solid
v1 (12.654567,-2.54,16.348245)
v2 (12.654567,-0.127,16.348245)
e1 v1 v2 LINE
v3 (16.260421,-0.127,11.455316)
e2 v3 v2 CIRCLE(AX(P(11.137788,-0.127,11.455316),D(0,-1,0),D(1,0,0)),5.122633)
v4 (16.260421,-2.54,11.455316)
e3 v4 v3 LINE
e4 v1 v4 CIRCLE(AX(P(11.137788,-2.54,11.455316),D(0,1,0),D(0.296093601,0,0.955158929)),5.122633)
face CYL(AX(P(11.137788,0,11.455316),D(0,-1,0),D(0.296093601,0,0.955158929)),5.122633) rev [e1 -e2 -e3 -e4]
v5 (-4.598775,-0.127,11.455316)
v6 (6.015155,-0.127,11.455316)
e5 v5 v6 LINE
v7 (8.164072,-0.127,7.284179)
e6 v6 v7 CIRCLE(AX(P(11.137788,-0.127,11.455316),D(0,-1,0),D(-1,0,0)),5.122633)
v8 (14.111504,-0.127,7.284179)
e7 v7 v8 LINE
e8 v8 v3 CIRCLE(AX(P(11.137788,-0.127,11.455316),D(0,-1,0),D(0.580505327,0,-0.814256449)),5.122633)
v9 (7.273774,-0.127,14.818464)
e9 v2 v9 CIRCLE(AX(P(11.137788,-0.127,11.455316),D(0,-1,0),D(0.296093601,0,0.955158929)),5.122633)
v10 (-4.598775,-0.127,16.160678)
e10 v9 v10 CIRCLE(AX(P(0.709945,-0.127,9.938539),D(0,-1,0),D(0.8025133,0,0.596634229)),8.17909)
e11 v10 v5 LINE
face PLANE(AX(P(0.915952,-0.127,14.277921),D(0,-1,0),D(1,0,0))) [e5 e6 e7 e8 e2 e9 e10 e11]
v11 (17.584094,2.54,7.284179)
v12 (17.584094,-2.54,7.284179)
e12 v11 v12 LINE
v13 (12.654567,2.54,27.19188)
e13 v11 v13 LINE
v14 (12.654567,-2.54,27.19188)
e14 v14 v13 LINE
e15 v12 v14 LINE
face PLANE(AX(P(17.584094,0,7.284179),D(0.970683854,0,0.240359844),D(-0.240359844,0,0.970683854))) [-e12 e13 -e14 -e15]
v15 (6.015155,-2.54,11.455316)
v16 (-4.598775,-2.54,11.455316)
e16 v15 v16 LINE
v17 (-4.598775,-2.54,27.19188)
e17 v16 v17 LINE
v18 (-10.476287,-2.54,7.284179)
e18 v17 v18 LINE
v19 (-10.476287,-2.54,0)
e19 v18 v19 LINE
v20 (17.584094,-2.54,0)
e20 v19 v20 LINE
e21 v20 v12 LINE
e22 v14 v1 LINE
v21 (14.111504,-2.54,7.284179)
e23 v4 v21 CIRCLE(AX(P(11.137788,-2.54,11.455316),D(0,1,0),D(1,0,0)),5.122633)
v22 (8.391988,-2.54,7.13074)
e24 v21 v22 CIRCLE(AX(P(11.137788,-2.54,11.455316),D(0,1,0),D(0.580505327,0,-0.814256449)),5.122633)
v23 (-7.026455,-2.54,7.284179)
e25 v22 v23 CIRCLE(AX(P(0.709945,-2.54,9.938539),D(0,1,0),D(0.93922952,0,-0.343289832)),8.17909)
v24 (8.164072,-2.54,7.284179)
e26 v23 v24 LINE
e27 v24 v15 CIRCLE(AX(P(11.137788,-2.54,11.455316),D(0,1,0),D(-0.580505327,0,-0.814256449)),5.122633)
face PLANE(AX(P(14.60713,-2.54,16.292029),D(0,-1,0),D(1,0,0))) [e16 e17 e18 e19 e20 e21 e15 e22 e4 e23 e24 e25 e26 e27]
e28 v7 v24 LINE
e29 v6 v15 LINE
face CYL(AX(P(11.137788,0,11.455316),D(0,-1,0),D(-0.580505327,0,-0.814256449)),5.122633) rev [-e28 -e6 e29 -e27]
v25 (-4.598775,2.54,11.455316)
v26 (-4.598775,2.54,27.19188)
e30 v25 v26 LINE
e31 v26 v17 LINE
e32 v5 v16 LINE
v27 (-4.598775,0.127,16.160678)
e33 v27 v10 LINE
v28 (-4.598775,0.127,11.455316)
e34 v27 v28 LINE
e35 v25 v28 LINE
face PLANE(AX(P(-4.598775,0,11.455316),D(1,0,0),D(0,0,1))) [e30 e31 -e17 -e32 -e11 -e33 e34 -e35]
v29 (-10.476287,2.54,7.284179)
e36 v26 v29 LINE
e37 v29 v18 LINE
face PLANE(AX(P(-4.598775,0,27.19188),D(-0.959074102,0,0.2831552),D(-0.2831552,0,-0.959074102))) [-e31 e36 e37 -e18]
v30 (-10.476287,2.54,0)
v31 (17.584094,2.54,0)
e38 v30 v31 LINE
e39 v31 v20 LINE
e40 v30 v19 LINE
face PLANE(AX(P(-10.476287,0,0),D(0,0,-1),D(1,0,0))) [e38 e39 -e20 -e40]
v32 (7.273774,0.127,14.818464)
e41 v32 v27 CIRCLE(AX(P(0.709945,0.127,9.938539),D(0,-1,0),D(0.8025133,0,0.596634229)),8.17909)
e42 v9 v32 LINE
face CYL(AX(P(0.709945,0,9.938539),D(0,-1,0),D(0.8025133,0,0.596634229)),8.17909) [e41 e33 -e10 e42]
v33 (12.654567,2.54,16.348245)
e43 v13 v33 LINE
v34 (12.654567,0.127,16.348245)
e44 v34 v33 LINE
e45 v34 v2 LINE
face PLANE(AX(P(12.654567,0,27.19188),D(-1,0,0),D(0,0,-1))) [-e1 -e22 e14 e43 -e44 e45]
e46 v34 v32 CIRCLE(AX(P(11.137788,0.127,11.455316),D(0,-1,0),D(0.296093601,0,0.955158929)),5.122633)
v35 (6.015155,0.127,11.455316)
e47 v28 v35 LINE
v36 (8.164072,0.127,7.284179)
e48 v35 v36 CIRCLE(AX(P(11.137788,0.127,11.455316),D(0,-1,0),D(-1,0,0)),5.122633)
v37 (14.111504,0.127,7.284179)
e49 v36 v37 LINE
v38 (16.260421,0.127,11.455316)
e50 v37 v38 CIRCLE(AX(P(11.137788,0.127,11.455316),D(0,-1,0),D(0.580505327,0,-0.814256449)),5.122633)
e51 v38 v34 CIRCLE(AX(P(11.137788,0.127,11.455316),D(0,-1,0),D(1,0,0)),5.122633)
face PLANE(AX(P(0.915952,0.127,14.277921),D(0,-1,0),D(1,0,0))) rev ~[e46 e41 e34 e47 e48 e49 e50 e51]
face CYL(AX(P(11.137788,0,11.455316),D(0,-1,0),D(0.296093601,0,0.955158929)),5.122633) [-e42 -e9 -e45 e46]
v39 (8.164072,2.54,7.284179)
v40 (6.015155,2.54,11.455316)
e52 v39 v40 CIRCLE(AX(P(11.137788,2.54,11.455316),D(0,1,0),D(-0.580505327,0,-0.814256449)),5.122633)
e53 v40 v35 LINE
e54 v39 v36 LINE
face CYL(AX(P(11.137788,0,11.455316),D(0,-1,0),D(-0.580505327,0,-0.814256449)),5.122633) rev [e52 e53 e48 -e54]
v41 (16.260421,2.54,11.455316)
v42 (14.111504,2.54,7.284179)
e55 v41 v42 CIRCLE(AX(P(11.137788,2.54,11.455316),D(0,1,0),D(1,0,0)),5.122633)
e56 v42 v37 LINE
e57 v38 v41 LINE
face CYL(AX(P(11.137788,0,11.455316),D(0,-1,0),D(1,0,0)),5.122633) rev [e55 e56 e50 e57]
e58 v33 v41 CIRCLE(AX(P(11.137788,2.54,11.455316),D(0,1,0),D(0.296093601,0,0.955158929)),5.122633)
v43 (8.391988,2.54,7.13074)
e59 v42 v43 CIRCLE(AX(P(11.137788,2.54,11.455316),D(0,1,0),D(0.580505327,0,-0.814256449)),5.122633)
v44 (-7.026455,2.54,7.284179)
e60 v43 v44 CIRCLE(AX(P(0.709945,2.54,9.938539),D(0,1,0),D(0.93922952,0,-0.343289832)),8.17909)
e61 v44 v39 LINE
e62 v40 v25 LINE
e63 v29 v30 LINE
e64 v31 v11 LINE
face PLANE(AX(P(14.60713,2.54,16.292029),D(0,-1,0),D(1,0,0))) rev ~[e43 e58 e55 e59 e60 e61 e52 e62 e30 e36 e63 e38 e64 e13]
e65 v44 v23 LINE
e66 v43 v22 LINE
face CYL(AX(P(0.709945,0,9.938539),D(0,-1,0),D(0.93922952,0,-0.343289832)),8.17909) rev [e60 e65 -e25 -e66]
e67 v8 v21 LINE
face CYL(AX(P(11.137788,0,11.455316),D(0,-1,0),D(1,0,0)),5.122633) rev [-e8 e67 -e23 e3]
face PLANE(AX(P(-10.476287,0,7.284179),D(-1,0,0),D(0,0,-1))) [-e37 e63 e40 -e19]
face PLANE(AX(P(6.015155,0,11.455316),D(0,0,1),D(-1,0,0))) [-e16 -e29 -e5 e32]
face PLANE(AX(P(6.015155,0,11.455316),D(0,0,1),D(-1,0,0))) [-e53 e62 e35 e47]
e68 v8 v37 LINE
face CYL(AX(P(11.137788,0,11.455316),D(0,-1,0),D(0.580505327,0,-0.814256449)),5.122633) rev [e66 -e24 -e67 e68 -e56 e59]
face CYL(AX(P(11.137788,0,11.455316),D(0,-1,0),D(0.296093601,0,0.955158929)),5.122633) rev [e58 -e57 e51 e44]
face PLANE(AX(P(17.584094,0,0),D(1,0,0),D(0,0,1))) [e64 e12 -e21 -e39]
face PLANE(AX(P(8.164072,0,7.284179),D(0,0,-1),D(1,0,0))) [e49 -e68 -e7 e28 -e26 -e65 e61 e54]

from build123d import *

# Parameters (mm, degrees)
F1_DEPTH = 2.54
F2_DEPTH = 0.127


# Not quite as in the source:
# - a feature names something its author has since deleted; it is built from what else it names


with BuildPart() as f1:
    # F0 (on Front) → F1 (new body, symmetric)
    with BuildSketch(Plane.XZ):
        with BuildLine():
            Line((14.1115041016, 7.2841788642), (17.5840938227, 7.2841788642))
            Line((17.5840938227, 7.2841788642), (12.6545671137, 27.1918801591))
            Line((12.6545671137, 27.1918801591), (12.6545671137, 16.3482450677))
            ThreePointArc((12.6545671137, 16.3482450677), (15.261577361, 14.4943512953), (16.2604214978, 11.4553160965))
            ThreePointArc((16.2604214978, 11.4553160965), (15.6916123075, 9.109243219), (14.1115041016, 7.2841788642))
        make_face()
        with BuildLine():
            Line((-4.5987749709, 27.1918801591), (-10.4762865467, 7.2841788642))
            Line((-10.4762865467, 7.2841788642), (-7.0264551949, 7.2841788642))
            ThreePointArc((-7.0264551949, 7.2841788642), (-7.1794052372, 12.0962388338), (-4.5987749709, 16.1606775766))
            Line((-4.5987749709, 16.1606775766), (-4.5987749709, 27.1918801591))
        make_face()
        with BuildLine():
            ThreePointArc((-4.5987749709, 16.1606775766), (-7.1794052372, 12.0962388338), (-7.0264551949, 7.2841788642))
            Line((-7.0264551949, 7.2841788642), (8.1640722191, 7.2841788642))
            ThreePointArc((8.1640722191, 7.2841788642), (6.5839640132, 9.109243219), (6.0151548229, 11.4553160965))
            Line((6.0151548229, 11.4553160965), (0.7099450795, 11.4553160965))
            Line((0.7099450795, 11.4553160965), (-4.5987749709, 11.4553160965))
            Line((-4.5987749709, 11.4553160965), (-4.5987749709, 16.1606775766))
        make_face()
        with BuildLine():
            Line((-10.4762865467, 7.2841788642), (-10.4762865467, 0))
            Line((-10.4762865467, 0), (17.5840938227, 0))
            Line((17.5840938227, 0), (17.5840938227, 7.2841788642))
            Line((17.5840938227, 7.2841788642), (14.1115041016, 7.2841788642))
            ThreePointArc((14.1115041016, 7.2841788642), (11.2751644394, 6.3345251354), (8.3919880677, 7.1307404918))
            ThreePointArc((8.3919880677, 7.1307404918), (0.6285539733, 1.7598537536), (-7.0264551949, 7.2841788642))
            Line((-7.0264551949, 7.2841788642), (-10.4762865467, 7.2841788642))
        make_face()
        with BuildLine():
            Line((-10.4762865467, 7.2841788642), (-10.4762865467, 0))
            Line((-10.4762865467, 0), (17.5840938227, 0))
            Line((17.5840938227, 0), (17.5840938227, 7.2841788642))
            Line((17.5840938227, 7.2841788642), (14.1115041016, 7.2841788642))
            ThreePointArc((14.1115041016, 7.2841788642), (11.2751644394, 6.3345251354), (8.3919880677, 7.1307404918))
            ThreePointArc((8.3919880677, 7.1307404918), (0.6285539733, 1.7598537536), (-7.0264551949, 7.2841788642))
            Line((-7.0264551949, 7.2841788642), (-10.4762865467, 7.2841788642))
        make_face()
    extrude(amount=F1_DEPTH, both=True)

    # F0 (on Front) → F2 (join, symmetric)
    with BuildSketch(Plane.XZ):
        with BuildLine():
            ThreePointArc((7.2737737734, 14.8184641943), (1.628753339, 18.0658576504), (-4.5987749709, 16.1606775766))
            Line((-4.5987749709, 16.1606775766), (-4.5987749709, 11.4553160965))
            Line((-4.5987749709, 11.4553160965), (0.7099450795, 11.4553160965))
            Line((0.7099450795, 11.4553160965), (6.0151548229, 11.4553160965))
            ThreePointArc((6.0151548229, 11.4553160965), (6.3401167864, 13.250788652), (7.2737737734, 14.8184641943))
        make_face()
        with BuildLine():
            ThreePointArc((7.2737737734, 14.8184641943), (6.3401167864, 13.250788652), (6.0151548229, 11.4553160965))
            Line((6.0151548229, 11.4553160965), (8.7471650108, 11.4553160965))
            ThreePointArc((8.7471650108, 11.4553160965), (8.2016302385, 13.220637488), (7.2737737734, 14.8184641943))
        make_face()
        with BuildLine():
            ThreePointArc((6.0151548229, 11.4553160965), (6.5839640132, 9.109243219), (8.1640722191, 7.2841788642))
            Line((8.1640722191, 7.2841788642), (8.4463453539, 7.2841788642))
            ThreePointArc((8.4463453539, 7.2841788642), (8.7776037503, 8.5930277501), (8.8890353081, 9.9385390058))
            ThreePointArc((8.8890353081, 9.9385390058), (8.8534904982, 10.7002377527), (8.7471650108, 11.4553160965))
            Line((8.7471650108, 11.4553160965), (6.0151548229, 11.4553160965))
        make_face()
        with BuildLine():
            Line((8.4463453539, 7.2841788642), (14.1115041016, 7.2841788642))
            ThreePointArc((14.1115041016, 7.2841788642), (15.6916123075, 9.109243219), (16.2604214978, 11.4553160965))
            ThreePointArc((16.2604214978, 11.4553160965), (15.261577361, 14.4943512953), (12.6545671137, 16.3482450677))
            ThreePointArc((12.6545671137, 16.3482450677), (9.7369184571, 16.3826821662), (7.2737737734, 14.8184641943))
            ThreePointArc((7.2737737734, 14.8184641943), (8.2016302385, 13.220637488), (8.7471650108, 11.4553160965))
            ThreePointArc((8.7471650108, 11.4553160965), (8.8534904982, 10.7002377527), (8.8890353081, 9.9385390058))
            ThreePointArc((8.8890353081, 9.9385390058), (8.7776037503, 8.5930277501), (8.4463453539, 7.2841788642))
        make_face()
    extrude(amount=F2_DEPTH, both=True)


solid = f1.part
